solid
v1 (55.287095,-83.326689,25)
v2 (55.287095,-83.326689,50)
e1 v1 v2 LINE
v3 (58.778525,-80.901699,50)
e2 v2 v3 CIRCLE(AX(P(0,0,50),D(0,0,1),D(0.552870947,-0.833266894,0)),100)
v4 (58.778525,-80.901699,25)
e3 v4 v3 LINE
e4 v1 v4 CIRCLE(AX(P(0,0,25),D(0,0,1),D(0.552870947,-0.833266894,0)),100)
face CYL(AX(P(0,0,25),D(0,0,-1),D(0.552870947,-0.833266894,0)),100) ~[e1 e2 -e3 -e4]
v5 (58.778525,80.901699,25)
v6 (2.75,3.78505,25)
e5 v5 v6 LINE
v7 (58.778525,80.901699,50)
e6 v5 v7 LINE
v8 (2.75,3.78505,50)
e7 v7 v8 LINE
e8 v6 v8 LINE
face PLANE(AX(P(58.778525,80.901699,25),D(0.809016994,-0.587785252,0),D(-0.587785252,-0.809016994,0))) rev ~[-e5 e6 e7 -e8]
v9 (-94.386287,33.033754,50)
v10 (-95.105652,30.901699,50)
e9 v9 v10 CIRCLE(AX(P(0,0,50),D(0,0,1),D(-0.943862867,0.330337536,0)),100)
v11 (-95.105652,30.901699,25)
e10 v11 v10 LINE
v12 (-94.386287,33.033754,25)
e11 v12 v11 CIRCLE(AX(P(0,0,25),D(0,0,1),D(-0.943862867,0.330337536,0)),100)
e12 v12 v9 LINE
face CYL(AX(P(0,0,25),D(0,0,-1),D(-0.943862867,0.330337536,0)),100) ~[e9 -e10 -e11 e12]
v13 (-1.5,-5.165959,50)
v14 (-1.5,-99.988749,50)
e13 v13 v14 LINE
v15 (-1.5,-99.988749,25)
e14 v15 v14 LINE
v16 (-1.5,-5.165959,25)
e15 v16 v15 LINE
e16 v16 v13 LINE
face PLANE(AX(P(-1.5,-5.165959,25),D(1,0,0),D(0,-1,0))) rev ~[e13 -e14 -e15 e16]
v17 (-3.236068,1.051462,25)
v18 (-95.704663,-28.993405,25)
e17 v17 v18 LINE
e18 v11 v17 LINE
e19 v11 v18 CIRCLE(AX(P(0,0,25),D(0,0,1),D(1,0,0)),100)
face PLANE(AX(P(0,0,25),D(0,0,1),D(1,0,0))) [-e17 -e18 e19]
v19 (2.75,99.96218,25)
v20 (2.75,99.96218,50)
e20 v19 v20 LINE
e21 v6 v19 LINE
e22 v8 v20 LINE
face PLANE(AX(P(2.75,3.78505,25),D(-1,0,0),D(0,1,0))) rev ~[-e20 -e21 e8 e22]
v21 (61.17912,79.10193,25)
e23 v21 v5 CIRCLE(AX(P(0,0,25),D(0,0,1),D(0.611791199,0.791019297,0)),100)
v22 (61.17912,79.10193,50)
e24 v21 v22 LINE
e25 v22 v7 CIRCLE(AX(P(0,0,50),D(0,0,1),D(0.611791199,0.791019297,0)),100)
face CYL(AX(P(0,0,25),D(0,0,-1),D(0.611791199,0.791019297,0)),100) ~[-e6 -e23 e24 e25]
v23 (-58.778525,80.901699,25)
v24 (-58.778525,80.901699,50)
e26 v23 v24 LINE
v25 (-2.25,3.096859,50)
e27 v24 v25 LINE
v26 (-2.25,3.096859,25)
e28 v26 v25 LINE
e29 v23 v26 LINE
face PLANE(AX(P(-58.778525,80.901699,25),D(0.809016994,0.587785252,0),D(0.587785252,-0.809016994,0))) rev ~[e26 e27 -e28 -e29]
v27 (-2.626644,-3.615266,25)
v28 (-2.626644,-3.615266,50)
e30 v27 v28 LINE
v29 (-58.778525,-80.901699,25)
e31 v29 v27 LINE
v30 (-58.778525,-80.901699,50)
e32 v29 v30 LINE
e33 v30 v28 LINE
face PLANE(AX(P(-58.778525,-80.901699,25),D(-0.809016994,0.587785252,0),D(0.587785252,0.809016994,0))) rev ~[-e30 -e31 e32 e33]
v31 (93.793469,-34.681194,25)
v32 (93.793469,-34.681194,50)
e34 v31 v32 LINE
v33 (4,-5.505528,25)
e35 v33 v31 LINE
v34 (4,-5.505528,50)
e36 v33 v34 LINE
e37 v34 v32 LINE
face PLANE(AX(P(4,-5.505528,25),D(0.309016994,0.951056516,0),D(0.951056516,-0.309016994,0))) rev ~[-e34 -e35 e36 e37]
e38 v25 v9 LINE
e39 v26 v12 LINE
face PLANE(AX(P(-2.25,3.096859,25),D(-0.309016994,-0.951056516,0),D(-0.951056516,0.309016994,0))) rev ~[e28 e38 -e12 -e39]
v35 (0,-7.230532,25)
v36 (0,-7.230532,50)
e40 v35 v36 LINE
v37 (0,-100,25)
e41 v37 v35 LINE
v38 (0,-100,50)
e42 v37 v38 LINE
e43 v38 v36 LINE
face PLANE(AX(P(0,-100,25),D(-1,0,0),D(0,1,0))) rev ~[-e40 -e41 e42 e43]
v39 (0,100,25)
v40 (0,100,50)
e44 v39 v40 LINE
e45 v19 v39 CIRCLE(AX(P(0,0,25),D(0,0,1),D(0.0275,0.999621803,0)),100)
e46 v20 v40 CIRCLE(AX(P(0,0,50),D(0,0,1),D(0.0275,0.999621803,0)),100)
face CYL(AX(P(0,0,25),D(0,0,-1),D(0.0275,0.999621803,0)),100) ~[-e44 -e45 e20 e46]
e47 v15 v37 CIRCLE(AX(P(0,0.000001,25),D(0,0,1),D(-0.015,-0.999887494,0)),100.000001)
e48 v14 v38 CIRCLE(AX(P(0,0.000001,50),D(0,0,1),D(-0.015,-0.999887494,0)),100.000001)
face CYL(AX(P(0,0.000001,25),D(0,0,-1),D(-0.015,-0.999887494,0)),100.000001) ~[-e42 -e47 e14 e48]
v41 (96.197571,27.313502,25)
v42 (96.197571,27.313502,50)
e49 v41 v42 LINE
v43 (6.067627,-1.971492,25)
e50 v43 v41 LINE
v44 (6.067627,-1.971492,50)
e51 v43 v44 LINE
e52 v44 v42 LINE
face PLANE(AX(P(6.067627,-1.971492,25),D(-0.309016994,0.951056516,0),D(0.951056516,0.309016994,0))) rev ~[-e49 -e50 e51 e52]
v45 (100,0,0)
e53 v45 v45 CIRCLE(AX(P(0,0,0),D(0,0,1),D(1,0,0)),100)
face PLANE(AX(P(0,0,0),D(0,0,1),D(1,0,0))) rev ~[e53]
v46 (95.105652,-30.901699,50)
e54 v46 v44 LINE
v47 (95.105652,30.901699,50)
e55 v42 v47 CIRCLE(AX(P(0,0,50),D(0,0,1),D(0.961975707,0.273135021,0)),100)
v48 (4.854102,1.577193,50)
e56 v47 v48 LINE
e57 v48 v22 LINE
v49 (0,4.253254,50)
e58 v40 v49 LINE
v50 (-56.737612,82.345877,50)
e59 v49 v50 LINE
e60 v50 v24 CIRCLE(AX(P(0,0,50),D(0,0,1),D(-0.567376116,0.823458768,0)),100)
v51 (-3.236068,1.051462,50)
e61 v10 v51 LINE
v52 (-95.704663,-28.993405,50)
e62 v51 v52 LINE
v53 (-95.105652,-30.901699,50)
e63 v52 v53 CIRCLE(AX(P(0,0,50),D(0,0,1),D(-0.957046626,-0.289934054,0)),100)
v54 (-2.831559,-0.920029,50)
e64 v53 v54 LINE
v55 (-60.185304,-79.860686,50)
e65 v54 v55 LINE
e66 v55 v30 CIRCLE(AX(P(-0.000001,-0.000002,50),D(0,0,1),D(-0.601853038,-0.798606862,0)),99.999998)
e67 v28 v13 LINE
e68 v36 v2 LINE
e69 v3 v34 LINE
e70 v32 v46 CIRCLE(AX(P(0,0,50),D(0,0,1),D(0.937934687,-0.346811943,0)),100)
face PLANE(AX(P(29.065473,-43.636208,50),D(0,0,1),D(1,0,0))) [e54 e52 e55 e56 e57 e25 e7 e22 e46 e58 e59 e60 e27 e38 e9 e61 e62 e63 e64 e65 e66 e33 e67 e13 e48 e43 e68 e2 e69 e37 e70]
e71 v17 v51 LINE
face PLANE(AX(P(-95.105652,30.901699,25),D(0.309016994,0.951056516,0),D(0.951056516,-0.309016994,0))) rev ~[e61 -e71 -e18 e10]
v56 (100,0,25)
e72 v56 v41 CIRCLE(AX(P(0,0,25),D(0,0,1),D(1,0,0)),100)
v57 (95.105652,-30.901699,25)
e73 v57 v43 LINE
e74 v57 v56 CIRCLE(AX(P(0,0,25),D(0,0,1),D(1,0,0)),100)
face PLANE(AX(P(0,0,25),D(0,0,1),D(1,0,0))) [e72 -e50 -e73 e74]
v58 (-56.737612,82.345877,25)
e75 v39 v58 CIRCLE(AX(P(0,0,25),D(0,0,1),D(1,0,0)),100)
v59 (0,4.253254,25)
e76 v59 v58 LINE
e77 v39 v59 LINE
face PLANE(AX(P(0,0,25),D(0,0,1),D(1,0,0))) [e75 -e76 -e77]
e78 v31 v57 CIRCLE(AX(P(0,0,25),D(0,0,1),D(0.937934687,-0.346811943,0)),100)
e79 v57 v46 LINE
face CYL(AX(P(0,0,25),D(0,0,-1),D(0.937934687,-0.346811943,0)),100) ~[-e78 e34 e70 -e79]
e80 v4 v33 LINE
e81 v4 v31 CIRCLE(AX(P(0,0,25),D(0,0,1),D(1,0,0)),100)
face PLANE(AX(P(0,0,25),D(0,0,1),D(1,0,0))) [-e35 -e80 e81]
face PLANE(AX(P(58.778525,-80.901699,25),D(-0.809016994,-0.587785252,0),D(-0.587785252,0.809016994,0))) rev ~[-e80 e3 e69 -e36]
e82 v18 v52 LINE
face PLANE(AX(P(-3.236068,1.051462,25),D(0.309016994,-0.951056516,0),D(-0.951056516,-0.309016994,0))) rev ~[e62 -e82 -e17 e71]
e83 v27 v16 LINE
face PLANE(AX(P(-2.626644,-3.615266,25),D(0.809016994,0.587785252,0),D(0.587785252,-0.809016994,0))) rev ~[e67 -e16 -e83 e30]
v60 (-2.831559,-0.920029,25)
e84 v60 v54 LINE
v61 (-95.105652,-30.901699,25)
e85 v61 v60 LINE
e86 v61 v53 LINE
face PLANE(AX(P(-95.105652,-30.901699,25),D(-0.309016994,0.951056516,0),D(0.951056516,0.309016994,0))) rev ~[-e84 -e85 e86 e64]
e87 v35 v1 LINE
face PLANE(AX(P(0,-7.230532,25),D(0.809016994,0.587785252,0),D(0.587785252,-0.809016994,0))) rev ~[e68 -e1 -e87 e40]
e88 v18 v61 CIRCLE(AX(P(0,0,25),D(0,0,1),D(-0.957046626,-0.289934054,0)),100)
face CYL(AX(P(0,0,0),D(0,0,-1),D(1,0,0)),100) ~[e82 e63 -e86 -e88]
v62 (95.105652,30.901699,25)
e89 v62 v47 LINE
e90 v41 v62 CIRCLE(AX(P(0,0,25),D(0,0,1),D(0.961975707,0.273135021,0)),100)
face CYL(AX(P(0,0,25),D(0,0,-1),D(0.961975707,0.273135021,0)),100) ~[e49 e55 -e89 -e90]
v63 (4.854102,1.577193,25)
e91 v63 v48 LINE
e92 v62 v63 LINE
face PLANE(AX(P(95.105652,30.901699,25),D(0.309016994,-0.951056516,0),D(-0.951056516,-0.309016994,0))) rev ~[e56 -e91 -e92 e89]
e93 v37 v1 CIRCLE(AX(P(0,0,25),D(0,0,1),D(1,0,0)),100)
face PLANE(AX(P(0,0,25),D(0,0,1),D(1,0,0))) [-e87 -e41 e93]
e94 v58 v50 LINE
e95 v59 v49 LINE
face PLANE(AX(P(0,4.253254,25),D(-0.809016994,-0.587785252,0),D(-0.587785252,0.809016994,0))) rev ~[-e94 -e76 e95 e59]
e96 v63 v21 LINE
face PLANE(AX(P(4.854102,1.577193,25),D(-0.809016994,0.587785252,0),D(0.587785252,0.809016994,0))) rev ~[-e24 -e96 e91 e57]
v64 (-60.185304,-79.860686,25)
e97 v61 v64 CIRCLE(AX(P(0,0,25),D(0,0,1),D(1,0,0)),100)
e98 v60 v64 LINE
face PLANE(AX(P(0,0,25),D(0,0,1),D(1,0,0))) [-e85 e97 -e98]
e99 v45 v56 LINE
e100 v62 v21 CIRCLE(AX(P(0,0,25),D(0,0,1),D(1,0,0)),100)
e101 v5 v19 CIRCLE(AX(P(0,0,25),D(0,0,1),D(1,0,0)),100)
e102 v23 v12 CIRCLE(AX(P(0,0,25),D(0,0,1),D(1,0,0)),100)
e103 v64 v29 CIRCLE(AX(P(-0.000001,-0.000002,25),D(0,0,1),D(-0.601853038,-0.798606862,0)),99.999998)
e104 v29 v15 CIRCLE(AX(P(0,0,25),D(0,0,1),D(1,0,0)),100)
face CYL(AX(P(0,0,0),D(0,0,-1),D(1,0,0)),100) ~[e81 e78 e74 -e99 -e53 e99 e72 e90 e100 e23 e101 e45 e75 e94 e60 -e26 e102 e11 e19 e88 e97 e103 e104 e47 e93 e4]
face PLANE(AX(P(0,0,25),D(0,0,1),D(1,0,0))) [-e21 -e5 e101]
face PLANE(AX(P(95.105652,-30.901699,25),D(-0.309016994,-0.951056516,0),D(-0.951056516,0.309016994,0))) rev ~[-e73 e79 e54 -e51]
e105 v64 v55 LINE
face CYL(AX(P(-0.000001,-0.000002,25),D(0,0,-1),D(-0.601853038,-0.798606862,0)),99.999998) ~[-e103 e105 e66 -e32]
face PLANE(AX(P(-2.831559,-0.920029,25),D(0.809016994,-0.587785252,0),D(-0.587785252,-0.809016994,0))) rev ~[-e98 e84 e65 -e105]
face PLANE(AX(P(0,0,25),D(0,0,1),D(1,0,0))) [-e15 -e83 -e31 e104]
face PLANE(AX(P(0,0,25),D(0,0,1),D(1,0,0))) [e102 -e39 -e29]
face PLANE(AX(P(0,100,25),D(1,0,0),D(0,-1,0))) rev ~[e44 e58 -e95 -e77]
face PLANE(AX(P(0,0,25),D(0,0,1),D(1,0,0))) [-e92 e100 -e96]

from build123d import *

# Parameters (mm, degrees)
F0_R     = 100
F1_DEPTH = 25
F3_DEPTH = 25


# Not quite as in the source:
# - a feature of the source that left no trace in its solid (it failed there, or was rolled back) is left out


with BuildPart() as f1:
    # F0 (on Top) → F1 (new body)
    with BuildSketch(Plane.XY):
        Circle(F0_R)
    extrude(amount=F1_DEPTH)

    # F2 (on face) → F3 (join)
    with BuildSketch(Plane.XY.offset(25)):
        with BuildLine():
            Line((4, -5.5055276819), (0, -4.205848897))
            Line((0, -4.205848897), (0, -7.230531871))
            Line((0, -7.230531871), (55.287094655, -83.3266893895))
            ThreePointArc((55.287094655, -83.3266893895), (57.0456970679, -82.1327489254), (58.7785252292, -80.9016994375))
            Line((58.7785252292, -80.9016994375), (4, -5.5055276819))
        make_face()
        with BuildLine():
            Line((6.0676274578, -1.9714916704), (2.3176274578, -3.1899405313))
            Line((2.3176274578, -3.1899405313), (4, -5.5055276819))
            Line((4, -5.5055276819), (93.7934686725, -34.6811942467))
            ThreePointArc((93.7934686725, -34.6811942467), (94.4684632985, -32.7980097266), (95.1056516295, -30.9016994375))
            Line((95.1056516295, -30.9016994375), (6.0676274578, -1.9714916704))
        make_face()
        with BuildLine():
            ThreePointArc((2.5, 0), (2.4692208515, -0.3910861626), (2.3776412907, -0.7725424859))
            Line((2.3776412907, -0.7725424859), (3, -0.9747590887))
            Line((3, -0.9747590887), (4.8541019662, 1.5771933364))
            Line((4.8541019662, 1.5771933364), (2.75, 0.8935291646))
            Line((2.75, 0.8935291646), (2.3776412907, 0.7725424859))
            ThreePointArc((2.3776412907, 0.7725424859), (2.4692208515, 0.3910861626), (2.5, 0))
        make_face()
        with BuildLine():
            ThreePointArc((2.0225424859, 1.4694631307), (2.2275163105, 1.1349762493), (2.3776412907, 0.7725424859))
            Line((2.3776412907, 0.7725424859), (2.75, 0.8935291646))
            Line((2.75, 0.8935291646), (2.75, 3.7850502813))
            Line((2.75, 3.7850502813), (1.5450849719, 2.1266270209))
            Line((1.5450849719, 2.1266270209), (2.0225424859, 1.4694631307))
        make_face()
        with BuildLine():
            ThreePointArc((0, 2.5), (0.7725424859, 2.3776412907), (1.4694631307, 2.0225424859))
            Line((1.4694631307, 2.0225424859), (1.5450849719, 2.1266270209))
            Line((1.5450849719, 2.1266270209), (0, 4.2532540418))
            Line((0, 4.2532540418), (0, 2.5))
        make_face()
        with BuildLine():
            ThreePointArc((-0.3411015737, 2.4766206242), (-0.1709509277, 2.4941483076), (0, 2.5))
            Line((0, 2.5), (0, 4.2532540418))
            Line((0, 4.2532540418), (-56.7376115832, 82.3458768356))
            ThreePointArc((-56.7376115832, 82.3458768356), (-57.7625819896, 81.6301667393), (-58.7785252292, 80.9016994375))
            Line((-58.7785252292, 80.9016994375), (-2.25, 3.0968593211))
            Line((-2.25, 3.0968593211), (-0.3411015737, 2.4766206242))
        make_face()
        with BuildLine():
            ThreePointArc((-2.0446187632, 1.438587541), (-1.7811355181, 1.7542965161), (-1.4694631307, 2.0225424859))
            Line((-1.4694631307, 2.0225424859), (-2.25, 3.0968593211))
            Line((-2.25, 3.0968593211), (-94.3862867265, 33.0337536163))
            ThreePointArc((-94.3862867265, 33.0337536163), (-94.7519661497, 31.9697499328), (-95.1056516295, 30.9016994375))
            Line((-95.1056516295, 30.9016994375), (-3.2360679775, 1.0514622242))
            Line((-3.2360679775, 1.0514622242), (-2.0446187632, 1.438587541))
        make_face()
        with BuildLine():
            ThreePointArc((-2.4651863178, -0.4157600492), (-2.4932429766, 0.1836830415), (-2.3776412907, 0.7725424859))
            Line((-2.3776412907, 0.7725424859), (-3.2360679775, 1.0514622242))
            Line((-3.2360679775, 1.0514622242), (-95.7046625854, -28.9934054469))
            ThreePointArc((-95.7046625854, -28.9934054469), (-95.4099282003, -29.9490500819), (-95.1056516295, -30.9016994375))
            Line((-95.1056516295, -30.9016994375), (-2.8315594803, -0.9200294462))
            Line((-2.8315594803, -0.9200294462), (-2.4651863178, -0.4157600492))
        make_face()
        with BuildLine():
            ThreePointArc((-1.5, -2), (-2.0336392212, -1.4540672329), (-2.3776412907, -0.7725424859))
            Line((-2.3776412907, -0.7725424859), (-2.8315594803, -0.9200294462))
            Line((-2.8315594803, -0.9200294462), (-60.1853038185, -79.8606862246))
            ThreePointArc((-60.1853038185, -79.8606862246), (-59.4841918711, -80.384270336), (-58.7785252292, -80.9016994375))
            Line((-58.7785252292, -80.9016994375), (-2.6266444522, -3.6152659355))
            Line((-2.6266444522, -3.6152659355), (-1.5, -2.0645728807))
            Line((-1.5, -2.0645728807), (-1.5, -2))
        make_face()
        with BuildLine():
            Line((0, -100), (0, -7.230531871))
            Line((0, -7.230531871), (-1.5, -5.1659589903))
            Line((-1.5, -5.1659589903), (-1.5, -99.9887493671))
            ThreePointArc((-1.5, -99.9887493671), (-0.7500210958, -99.9971873022), (0, -100))
        make_face()
        with BuildLine():
            Line((0, 4.2532540418), (1.5450849719, 2.1266270209))
            Line((1.5450849719, 2.1266270209), (2.75, 3.7850502813))
            Line((2.75, 3.7850502813), (2.75, 99.9621803484))
            ThreePointArc((2.75, 99.9621803484), (1.3751300235, 99.9905446401), (0, 100))
            Line((0, 100), (0, 4.2532540418))
        make_face()
        with BuildLine():
            Line((2.75, 3.7850502813), (2.75, 0.8935291646))
            Line((2.75, 0.8935291646), (4.8541019662, 1.5771933364))
            Line((4.8541019662, 1.5771933364), (61.179119922, 79.1019297209))
            ThreePointArc((61.179119922, 79.1019297209), (59.9855728515, 80.010818329), (58.7785252292, 80.9016994375))
            Line((58.7785252292, 80.9016994375), (2.75, 3.7850502813))
        make_face()
        with BuildLine():
            Line((4.8541019662, 1.5771933364), (3, -0.9747590887))
            Line((3, -0.9747590887), (6.0676274578, -1.9714916704))
            Line((6.0676274578, -1.9714916704), (96.1975706712, 27.3135020999))
            ThreePointArc((96.1975706712, 27.3135020999), (95.6684352631, 29.1127204897), (95.1056516295, 30.9016994375))
            Line((95.1056516295, 30.9016994375), (4.8541019662, 1.5771933364))
        make_face()
        with BuildLine():
            Line((1.5450849719, 2.1266270209), (1.4694631307, 2.0225424859))
            ThreePointArc((1.4694631307, 2.0225424859), (1.767766953, 1.767766953), (2.0225424859, 1.4694631307))
            Line((2.0225424859, 1.4694631307), (1.5450849719, 2.1266270209))
        make_face()
        with BuildLine():
            ThreePointArc((-1.4694631307, 2.0225424859), (-0.9333182073, 2.3192492587), (-0.3411015737, 2.4766206242))
            Line((-0.3411015737, 2.4766206242), (-2.25, 3.0968593211))
            Line((-2.25, 3.0968593211), (-1.4694631307, 2.0225424859))
        make_face()
        with BuildLine():
            ThreePointArc((-2.3776412907, 0.7725424859), (-2.2360679775, 1.1180339887), (-2.0446187632, 1.438587541))
            Line((-2.0446187632, 1.438587541), (-3.2360679775, 1.0514622242))
            Line((-3.2360679775, 1.0514622242), (-2.3776412907, 0.7725424859))
        make_face()
        with BuildLine():
            ThreePointArc((-2.3776412907, -0.7725424859), (-2.427976161, -0.5957614973), (-2.4651863178, -0.4157600492))
            Line((-2.4651863178, -0.4157600492), (-2.8315594803, -0.9200294462))
            Line((-2.8315594803, -0.9200294462), (-2.3776412907, -0.7725424859))
        make_face()
        with BuildLine():
            Line((-1.5, -2.0645728807), (-1.4694631307, -2.0225424859))
            ThreePointArc((-1.4694631307, -2.0225424859), (-1.4847743472, -2.0113291968), (-1.5, -2))
            Line((-1.5, -2), (-1.5, -2.0645728807))
        make_face()
        with BuildLine():
            ThreePointArc((1.4694631307, -2.0225424859), (0.7725424859, -2.3776412907), (0, -2.5))
            Line((0, -2.5), (0, -4.205848897))
            Line((0, -4.205848897), (4, -5.5055276819))
            Line((4, -5.5055276819), (2.3176274578, -3.1899405313))
            Line((2.3176274578, -3.1899405313), (1.4694631307, -2.0225424859))
        make_face()
        with BuildLine():
            ThreePointArc((2.3776412907, -0.7725424859), (2.0225424859, -1.4694631307), (1.4694631307, -2.0225424859))
            Line((1.4694631307, -2.0225424859), (2.3176274578, -3.1899405313))
            Line((2.3176274578, -3.1899405313), (6.0676274578, -1.9714916704))
            Line((6.0676274578, -1.9714916704), (3, -0.9747590887))
            Line((3, -0.9747590887), (2.3776412907, -0.7725424859))
        make_face()
        with BuildLine():
            Line((0, -4.205848897), (0, -2.5))
            ThreePointArc((0, -2.5), (-0.7725424859, -2.3776412907), (-1.4694631307, -2.0225424859))
            Line((-1.4694631307, -2.0225424859), (-1.5, -2.0645728807))
            Line((-1.5, -2.0645728807), (-1.5, -5.1659589903))
            Line((-1.5, -5.1659589903), (0, -7.230531871))
            Line((0, -7.230531871), (0, -4.205848897))
        make_face()
        Polygon((-1.5, -5.1659589903), (-1.5, -2.0645728807), (-2.6266444522, -3.6152659355), align=None)
        with BuildLine():
            Line((1.4694631307, -2.0225424859), (0, 0))
            Line((0, 0), (0, -2.5))
            ThreePointArc((0, -2.5), (0.7725424859, -2.3776412907), (1.4694631307, -2.0225424859))
        make_face()
        with BuildLine():
            Line((2.3776412907, -0.7725424859), (0, 0))
            Line((0, 0), (1.4694631307, -2.0225424859))
            ThreePointArc((1.4694631307, -2.0225424859), (2.0225424859, -1.4694631307), (2.3776412907, -0.7725424859))
        make_face()
        with BuildLine():
            Line((2.3776412907, 0.7725424859), (0, 0))
            Line((0, 0), (2.3776412907, -0.7725424859))
            ThreePointArc((2.3776412907, -0.7725424859), (2.4692208515, -0.3910861626), (2.5, 0))
            ThreePointArc((2.5, 0), (2.4692208515, 0.3910861626), (2.3776412907, 0.7725424859))
        make_face()
        with BuildLine():
            Line((1.4694631307, 2.0225424859), (0, 0))
            Line((0, 0), (2.3776412907, 0.7725424859))
            ThreePointArc((2.3776412907, 0.7725424859), (2.2275163105, 1.1349762493), (2.0225424859, 1.4694631307))
            ThreePointArc((2.0225424859, 1.4694631307), (1.767766953, 1.767766953), (1.4694631307, 2.0225424859))
        make_face()
        with BuildLine():
            Line((0, 2.3657900045), (0, 0))
            Line((0, 0), (1.4694631307, 2.0225424859))
            ThreePointArc((1.4694631307, 2.0225424859), (0.7725424859, 2.3776412907), (0, 2.5))
            Line((0, 2.5), (0, 2.3657900045))
        make_face()
        with BuildLine():
            Line((-1.2360679775, 1.7013016167), (0, 0))
            Line((0, 0), (0, 2.3657900045))
            Line((0, 2.3657900045), (-0.3411015737, 2.4766206242))
            ThreePointArc((-0.3411015737, 2.4766206242), (-0.9333182073, 2.3192492587), (-1.4694631307, 2.0225424859))
            Line((-1.4694631307, 2.0225424859), (-1.2360679775, 1.7013016167))
        make_face()
        with BuildLine():
            Line((-1.75, 0.5686094684), (0, 0))
            Line((0, 0), (-1.2360679775, 1.7013016167))
            Line((-1.2360679775, 1.7013016167), (-2.0446187632, 1.438587541))
            ThreePointArc((-2.0446187632, 1.438587541), (-2.2360679775, 1.1180339887), (-2.3776412907, 0.7725424859))
            Line((-2.3776412907, 0.7725424859), (-1.75, 0.5686094684))
        make_face()
        with BuildLine():
            Line((-1.5, -0.4873795443), (0, 0))
            Line((0, 0), (-1.75, 0.5686094684))
            Line((-1.75, 0.5686094684), (-2.4651863178, -0.4157600492))
            ThreePointArc((-2.4651863178, -0.4157600492), (-2.427976161, -0.5957614973), (-2.3776412907, -0.7725424859))
            Line((-2.3776412907, -0.7725424859), (-1.5, -0.4873795443))
        make_face()
        with BuildLine():
            Line((-1.4694631307, -2.0225424859), (0, 0))
            Line((0, 0), (-1.5, -0.4873795443))
            Line((-1.5, -0.4873795443), (-1.5, -2))
            ThreePointArc((-1.5, -2), (-1.4847743472, -2.0113291968), (-1.4694631307, -2.0225424859))
        make_face()
        with BuildLine():
            Line((0, -2.5), (0, 0))
            Line((0, 0), (-1.4694631307, -2.0225424859))
            ThreePointArc((-1.4694631307, -2.0225424859), (-0.7725424859, -2.3776412907), (0, -2.5))
        make_face()
        with BuildLine():
            Line((-1.5, -2), (-1.5, -0.4873795443))
            Line((-1.5, -0.4873795443), (-2.3776412907, -0.7725424859))
            ThreePointArc((-2.3776412907, -0.7725424859), (-2.0336392212, -1.4540672329), (-1.5, -2))
        make_face()
        with BuildLine():
            Line((-2.4651863178, -0.4157600492), (-1.75, 0.5686094684))
            Line((-1.75, 0.5686094684), (-2.3776412907, 0.7725424859))
            ThreePointArc((-2.3776412907, 0.7725424859), (-2.4932429766, 0.1836830415), (-2.4651863178, -0.4157600492))
        make_face()
        with BuildLine():
            Line((-2.0446187632, 1.438587541), (-1.2360679775, 1.7013016167))
            Line((-1.2360679775, 1.7013016167), (-1.4694631307, 2.0225424859))
            ThreePointArc((-1.4694631307, 2.0225424859), (-1.7811355181, 1.7542965161), (-2.0446187632, 1.438587541))
        make_face()
        with BuildLine():
            Line((-0.3411015737, 2.4766206242), (0, 2.3657900045))
            Line((0, 2.3657900045), (0, 2.5))
            ThreePointArc((0, 2.5), (-0.1709509277, 2.4941483076), (-0.3411015737, 2.4766206242))
        make_face()
    extrude(amount=F3_DEPTH)


solid = f1.part
